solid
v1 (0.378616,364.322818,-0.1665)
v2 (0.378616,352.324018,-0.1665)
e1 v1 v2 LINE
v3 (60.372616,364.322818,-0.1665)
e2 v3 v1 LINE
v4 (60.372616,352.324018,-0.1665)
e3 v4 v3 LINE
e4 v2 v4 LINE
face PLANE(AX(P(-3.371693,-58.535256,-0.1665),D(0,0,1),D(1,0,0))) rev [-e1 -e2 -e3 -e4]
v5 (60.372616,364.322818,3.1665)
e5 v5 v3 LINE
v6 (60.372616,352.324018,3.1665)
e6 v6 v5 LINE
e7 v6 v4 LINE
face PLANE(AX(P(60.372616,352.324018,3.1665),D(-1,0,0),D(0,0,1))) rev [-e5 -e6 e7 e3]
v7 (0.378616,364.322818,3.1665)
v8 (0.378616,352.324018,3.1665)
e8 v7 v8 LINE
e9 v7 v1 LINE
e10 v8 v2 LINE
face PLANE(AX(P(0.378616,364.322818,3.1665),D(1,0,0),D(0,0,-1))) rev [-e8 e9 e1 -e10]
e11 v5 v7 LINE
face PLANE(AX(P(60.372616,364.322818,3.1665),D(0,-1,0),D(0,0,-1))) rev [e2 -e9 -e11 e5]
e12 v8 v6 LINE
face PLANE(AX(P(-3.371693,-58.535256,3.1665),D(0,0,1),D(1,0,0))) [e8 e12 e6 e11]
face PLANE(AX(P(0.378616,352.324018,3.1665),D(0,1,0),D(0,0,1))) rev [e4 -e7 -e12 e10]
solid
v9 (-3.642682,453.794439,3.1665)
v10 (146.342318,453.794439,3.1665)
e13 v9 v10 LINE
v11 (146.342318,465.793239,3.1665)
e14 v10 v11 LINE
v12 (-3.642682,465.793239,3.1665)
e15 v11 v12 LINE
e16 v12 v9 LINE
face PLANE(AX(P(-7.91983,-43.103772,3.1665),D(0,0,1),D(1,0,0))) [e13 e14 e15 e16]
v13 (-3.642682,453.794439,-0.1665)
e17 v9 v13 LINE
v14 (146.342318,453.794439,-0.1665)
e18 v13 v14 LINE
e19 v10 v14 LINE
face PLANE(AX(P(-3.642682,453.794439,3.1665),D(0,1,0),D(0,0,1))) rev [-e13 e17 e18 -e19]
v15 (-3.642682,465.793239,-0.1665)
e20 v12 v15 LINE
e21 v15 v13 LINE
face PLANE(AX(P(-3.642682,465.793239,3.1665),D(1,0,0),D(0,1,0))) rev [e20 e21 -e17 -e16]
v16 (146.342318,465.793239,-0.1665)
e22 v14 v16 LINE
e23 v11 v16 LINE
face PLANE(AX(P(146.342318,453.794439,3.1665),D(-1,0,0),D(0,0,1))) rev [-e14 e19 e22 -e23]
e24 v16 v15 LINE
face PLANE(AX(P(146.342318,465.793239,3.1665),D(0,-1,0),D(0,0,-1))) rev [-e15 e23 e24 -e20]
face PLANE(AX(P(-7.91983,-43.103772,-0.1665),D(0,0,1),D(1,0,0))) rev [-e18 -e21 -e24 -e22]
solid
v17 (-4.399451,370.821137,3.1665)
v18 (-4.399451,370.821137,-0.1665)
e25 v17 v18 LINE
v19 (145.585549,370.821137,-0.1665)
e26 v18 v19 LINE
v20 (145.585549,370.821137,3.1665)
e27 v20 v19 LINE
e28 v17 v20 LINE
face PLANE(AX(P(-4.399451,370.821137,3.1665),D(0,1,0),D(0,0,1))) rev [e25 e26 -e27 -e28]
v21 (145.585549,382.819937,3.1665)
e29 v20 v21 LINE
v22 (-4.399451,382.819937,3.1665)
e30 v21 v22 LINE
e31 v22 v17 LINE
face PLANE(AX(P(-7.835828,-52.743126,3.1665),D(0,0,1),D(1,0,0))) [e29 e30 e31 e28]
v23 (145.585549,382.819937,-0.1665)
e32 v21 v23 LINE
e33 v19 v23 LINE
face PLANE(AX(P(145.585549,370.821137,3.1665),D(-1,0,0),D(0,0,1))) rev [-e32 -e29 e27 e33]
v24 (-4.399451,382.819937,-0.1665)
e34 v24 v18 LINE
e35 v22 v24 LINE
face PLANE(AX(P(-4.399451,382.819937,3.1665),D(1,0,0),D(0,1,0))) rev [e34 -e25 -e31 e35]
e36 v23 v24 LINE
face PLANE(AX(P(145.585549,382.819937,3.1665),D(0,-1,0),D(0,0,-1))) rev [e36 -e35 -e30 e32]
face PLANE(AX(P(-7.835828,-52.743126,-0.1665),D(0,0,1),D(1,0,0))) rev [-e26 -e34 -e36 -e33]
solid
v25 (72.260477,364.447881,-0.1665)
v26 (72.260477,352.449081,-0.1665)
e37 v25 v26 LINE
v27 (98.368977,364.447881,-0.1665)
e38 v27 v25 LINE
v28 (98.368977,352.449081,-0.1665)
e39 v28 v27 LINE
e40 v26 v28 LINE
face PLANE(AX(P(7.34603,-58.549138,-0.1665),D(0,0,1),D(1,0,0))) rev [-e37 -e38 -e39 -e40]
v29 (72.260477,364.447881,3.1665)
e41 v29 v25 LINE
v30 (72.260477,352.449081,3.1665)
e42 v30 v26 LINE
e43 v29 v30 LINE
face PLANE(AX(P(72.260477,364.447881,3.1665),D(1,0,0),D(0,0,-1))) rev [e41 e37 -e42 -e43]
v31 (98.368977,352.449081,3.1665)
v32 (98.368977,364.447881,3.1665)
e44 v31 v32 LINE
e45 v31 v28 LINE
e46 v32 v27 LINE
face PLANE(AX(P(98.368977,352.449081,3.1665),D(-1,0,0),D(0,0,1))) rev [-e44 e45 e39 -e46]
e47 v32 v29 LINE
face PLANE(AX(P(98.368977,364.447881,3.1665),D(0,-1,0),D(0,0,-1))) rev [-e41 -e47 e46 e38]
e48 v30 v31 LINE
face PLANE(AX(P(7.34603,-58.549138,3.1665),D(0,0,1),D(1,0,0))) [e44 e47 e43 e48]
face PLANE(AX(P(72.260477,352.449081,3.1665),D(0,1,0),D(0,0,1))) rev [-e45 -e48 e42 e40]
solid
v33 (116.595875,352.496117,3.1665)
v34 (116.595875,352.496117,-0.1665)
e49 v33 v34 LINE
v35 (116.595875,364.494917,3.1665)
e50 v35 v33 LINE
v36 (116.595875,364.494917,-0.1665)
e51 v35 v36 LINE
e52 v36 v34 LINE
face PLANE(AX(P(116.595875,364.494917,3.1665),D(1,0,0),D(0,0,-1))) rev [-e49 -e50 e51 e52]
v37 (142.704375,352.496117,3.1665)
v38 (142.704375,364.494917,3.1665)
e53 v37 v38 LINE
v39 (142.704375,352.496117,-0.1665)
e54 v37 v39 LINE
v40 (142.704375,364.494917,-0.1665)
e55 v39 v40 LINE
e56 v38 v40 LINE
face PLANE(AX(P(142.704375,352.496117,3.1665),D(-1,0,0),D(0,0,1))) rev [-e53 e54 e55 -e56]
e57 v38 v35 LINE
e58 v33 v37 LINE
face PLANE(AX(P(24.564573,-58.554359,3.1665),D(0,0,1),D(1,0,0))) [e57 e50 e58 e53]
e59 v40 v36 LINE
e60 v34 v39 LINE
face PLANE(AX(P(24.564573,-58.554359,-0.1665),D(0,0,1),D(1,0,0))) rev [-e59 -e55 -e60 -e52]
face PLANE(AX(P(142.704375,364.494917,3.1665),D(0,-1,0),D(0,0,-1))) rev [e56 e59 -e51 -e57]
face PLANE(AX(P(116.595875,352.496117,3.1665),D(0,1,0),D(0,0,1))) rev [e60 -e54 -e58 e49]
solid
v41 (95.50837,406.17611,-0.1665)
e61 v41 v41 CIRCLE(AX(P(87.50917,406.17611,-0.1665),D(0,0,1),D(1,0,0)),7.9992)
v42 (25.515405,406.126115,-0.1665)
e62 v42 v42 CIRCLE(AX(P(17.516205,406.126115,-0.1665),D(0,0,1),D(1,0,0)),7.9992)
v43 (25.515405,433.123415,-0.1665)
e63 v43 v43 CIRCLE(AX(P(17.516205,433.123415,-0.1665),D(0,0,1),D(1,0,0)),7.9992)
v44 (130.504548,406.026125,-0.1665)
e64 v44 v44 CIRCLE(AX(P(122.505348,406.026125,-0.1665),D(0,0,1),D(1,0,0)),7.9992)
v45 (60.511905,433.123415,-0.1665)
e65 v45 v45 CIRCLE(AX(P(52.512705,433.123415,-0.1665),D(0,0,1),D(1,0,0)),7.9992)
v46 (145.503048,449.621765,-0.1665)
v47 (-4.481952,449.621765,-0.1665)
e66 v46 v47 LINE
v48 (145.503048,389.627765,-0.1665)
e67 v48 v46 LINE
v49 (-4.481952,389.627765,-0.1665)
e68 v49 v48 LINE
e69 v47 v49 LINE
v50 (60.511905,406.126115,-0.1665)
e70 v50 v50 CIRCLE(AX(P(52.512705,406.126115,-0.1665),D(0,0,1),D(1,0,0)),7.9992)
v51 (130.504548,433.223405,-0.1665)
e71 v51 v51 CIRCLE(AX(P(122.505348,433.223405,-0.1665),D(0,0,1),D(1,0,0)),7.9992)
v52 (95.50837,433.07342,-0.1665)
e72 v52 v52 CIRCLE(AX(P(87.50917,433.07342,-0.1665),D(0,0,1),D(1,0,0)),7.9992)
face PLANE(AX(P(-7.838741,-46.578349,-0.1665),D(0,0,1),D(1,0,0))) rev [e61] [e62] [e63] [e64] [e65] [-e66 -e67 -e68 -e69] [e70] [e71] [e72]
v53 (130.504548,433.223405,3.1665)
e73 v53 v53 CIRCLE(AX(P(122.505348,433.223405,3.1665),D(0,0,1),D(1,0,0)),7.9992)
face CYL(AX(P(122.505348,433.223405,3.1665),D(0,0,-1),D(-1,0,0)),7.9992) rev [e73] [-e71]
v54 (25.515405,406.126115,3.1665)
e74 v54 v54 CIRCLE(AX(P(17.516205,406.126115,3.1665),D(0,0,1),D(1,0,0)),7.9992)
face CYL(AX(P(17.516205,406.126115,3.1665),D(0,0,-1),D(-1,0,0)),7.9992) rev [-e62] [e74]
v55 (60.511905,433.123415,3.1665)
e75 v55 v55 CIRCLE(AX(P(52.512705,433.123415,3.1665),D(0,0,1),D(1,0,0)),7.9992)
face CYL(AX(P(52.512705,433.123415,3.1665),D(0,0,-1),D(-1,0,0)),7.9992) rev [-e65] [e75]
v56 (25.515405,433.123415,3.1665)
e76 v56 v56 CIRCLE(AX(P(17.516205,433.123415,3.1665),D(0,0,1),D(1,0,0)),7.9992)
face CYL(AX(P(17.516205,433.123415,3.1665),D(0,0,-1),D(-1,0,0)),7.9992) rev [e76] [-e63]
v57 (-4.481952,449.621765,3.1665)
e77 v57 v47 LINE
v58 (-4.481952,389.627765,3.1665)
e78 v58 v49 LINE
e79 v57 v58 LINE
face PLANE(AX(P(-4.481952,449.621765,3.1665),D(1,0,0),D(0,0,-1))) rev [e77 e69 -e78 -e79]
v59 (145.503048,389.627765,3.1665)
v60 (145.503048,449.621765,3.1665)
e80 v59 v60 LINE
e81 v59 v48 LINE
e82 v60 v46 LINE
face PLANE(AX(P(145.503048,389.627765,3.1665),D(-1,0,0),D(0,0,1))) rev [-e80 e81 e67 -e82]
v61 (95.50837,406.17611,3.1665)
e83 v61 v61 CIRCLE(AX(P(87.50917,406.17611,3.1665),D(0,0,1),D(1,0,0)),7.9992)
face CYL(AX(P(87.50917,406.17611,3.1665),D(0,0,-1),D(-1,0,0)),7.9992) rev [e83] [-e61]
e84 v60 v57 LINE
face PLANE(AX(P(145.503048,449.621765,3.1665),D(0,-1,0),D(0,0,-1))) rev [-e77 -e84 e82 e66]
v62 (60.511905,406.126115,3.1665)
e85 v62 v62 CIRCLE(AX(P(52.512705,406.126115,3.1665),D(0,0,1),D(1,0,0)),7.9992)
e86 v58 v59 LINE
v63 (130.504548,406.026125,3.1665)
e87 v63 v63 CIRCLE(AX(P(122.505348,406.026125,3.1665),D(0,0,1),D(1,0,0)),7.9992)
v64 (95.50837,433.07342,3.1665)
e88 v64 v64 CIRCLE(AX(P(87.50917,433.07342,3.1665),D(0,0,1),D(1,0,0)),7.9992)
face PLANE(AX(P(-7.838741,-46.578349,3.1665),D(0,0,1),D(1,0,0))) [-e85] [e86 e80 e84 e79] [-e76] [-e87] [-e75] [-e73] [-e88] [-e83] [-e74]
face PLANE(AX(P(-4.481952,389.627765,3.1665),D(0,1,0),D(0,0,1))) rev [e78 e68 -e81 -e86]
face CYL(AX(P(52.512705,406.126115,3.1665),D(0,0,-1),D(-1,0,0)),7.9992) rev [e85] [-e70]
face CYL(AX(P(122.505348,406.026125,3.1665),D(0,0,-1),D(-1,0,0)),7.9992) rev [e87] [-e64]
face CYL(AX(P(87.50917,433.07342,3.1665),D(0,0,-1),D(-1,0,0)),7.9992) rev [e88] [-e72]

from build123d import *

# Parameters (mm, degrees)
MODEL_W               = 135
MODEL_H               = 54
MODEL_R               = 7.2
BOSS_EXTRUDE1_DEPTH   = 3
MODEL_W_2             = 54
MODEL_H_2             = 10.8
BOSS_EXTRUDE1_2_DEPTH = 3
BOSS_EXTRUDE1_3_DEPTH = 3
MODEL_W_3             = 23.5
BOSS_EXTRUDE1_4_DEPTH = 3
BOSS_EXTRUDE1_5_DEPTH = 3
BOSS_EXTRUDE1_6_DEPTH = 3
SCALE1_DEPTH          = 3
SCALE1_START          = -0.1665
SCALE1_2_OUTLINE_W    = 149.985
SCALE1_2_OUTLINE_H    = 59.994
SCALE1_2_OUTLINE_R    = 7.9992
SCALE1_2_DEPTH        = 3.333
SCALE1_START_2        = 446.653714964
SCALE1_3_OUTLINE_W    = 149.985
SCALE1_3_OUTLINE_H    = 3.333
SCALE1_3_DEPTH        = 11.9988
SCALE1_START_3        = 369.383026174
SCALE1_4_OUTLINE_W    = 26.1085
SCALE1_4_OUTLINE_H    = 3.333
SCALE1_4_DEPTH        = 11.9988
SCALE1_START_4        = 369.335990799
SCALE1_5_OUTLINE_W    = 26.1085
SCALE1_5_OUTLINE_H    = 3.333
SCALE1_5_DEPTH        = 11.9988
SCALE1_START_5        = 369.210927513
SCALE1_6_OUTLINE_W    = 59.994
SCALE1_6_OUTLINE_H    = 3.333
SCALE1_6_DEPTH        = 11.9988
SCALE1_START_6        = 380.646561708
SCALE1_7_OUTLINE_W    = 149.985
SCALE1_7_OUTLINE_H    = 3.333
SCALE1_7_DEPTH        = 11.9988


# Read off the part's stored shape, not the designer's step: Scale1
with BuildPart() as part:
    # Model → Boss-Extrude1 (new body)
    with BuildSketch(Plane.XY):
        with Locations((70.521412424, 419.624764679)):
            Rectangle(MODEL_W, MODEL_H)
        with Locations((117.321412424, 431.864764679)):
            Circle(MODEL_R, mode=Mode.SUBTRACT)
        with Locations((54.321733854, 407.474764679)):
            Circle(MODEL_R, mode=Mode.SUBTRACT)
        with Locations((22.821733854, 431.774764679)):
            Circle(MODEL_R, mode=Mode.SUBTRACT)
        with Locations((22.821733854, 407.474764679)):
            Circle(MODEL_R, mode=Mode.SUBTRACT)
        with Locations((117.321412424, 407.384764679)):
            Circle(MODEL_R, mode=Mode.SUBTRACT)
        with Locations((85.821701711, 431.729764679)):
            Circle(MODEL_R, mode=Mode.SUBTRACT)
        with Locations((85.821701711, 407.519764679)):
            Circle(MODEL_R, mode=Mode.SUBTRACT)
        with Locations((54.321733854, 431.774764679)):
            Circle(MODEL_R, mode=Mode.SUBTRACT)
    extrude(amount=BOSS_EXTRUDE1_DEPTH)

    # Scale1 outline → Scale1 (cut)
    with BuildSketch(Plane.XY):
        with BuildLine():
            ThreePointArc((120.599852685, 425.454473776), (130.243207193, 435.251393662), (117.034279248, 439.059037022))
            ThreePointArc((117.034279248, 439.059037022), (124.286181967, 433.690137301), (120.599852685, 425.454473776))
        make_face()
        with BuildLine():
            ThreePointArc((59.775926661, 402.774575233), (48.549318786, 403.171367849), (51.374507231, 414.04392408))
            ThreePointArc((51.374507231, 414.04392408), (46.099552197, 401.3450408), (59.775926661, 402.774575233))
        make_face()
        with BuildLine():
            ThreePointArc((19.516367614, 425.378316132), (15.843653478, 433.548572523), (22.972146088, 438.973193408))
            ThreePointArc((22.972146088, 438.973193408), (9.76355804, 435.094115194), (19.516367614, 425.378316132))
        make_face()
        with BuildLine():
            ThreePointArc((22.972146088, 400.27633595), (15.843653478, 405.700956835), (19.516367614, 413.871213226))
            ThreePointArc((19.516367614, 413.871213226), (9.76355804, 404.155414164), (22.972146088, 400.27633595))
        make_face()
        with BuildLine():
            ThreePointArc((117.034279248, 400.190492336), (130.243207193, 403.998135696), (120.599852685, 413.795055582))
            ThreePointArc((120.599852685, 413.795055582), (124.286181967, 405.559392057), (117.034279248, 400.190492336))
        make_face()
        with BuildLine():
            ThreePointArc((88.815187829, 425.181555698), (93.766910466, 438.056177976), (80.110310207, 436.11382753))
            ThreePointArc((80.110310207, 436.11382753), (91.454231718, 436.21469564), (88.815187829, 425.181555698))
        make_face()
        with BuildLine():
            ThreePointArc((80.110310207, 403.135701828), (93.766910466, 401.193351382), (88.815187829, 414.06797366))
            ThreePointArc((88.815187829, 414.06797366), (91.454231718, 403.034833718), (80.110310207, 403.135701828))
        make_face()
        with BuildLine():
            ThreePointArc((51.374507231, 425.205605278), (48.549318786, 436.078161509), (59.775926661, 436.474954125))
            ThreePointArc((59.775926661, 436.474954125), (46.099552197, 437.904488558), (51.374507231, 425.205605278))
        make_face()
    extrude(amount=SCALE1_DEPTH, mode=Mode.SUBTRACT)

    # Scale1 2 outline → Scale1 2 (add)
    with BuildSketch(Plane.XY.offset(SCALE1_START)):
        with Locations((70.51054823, 419.624764679)):
            Rectangle(SCALE1_2_OUTLINE_W, SCALE1_2_OUTLINE_H)
        with Locations((87.509169628, 433.073419679)):
            Circle(SCALE1_2_OUTLINE_R, mode=Mode.SUBTRACT)
        with Locations((122.50534823, 433.223404679)):
            Circle(SCALE1_2_OUTLINE_R, mode=Mode.SUBTRACT)
        with Locations((17.516205338, 406.126114679)):
            Circle(SCALE1_2_OUTLINE_R, mode=Mode.SUBTRACT)
        with Locations((52.512705338, 406.126114679)):
            Circle(SCALE1_2_OUTLINE_R, mode=Mode.SUBTRACT)
        with Locations((87.509169628, 406.176109679)):
            Circle(SCALE1_2_OUTLINE_R, mode=Mode.SUBTRACT)
        with Locations((122.50534823, 406.026124679)):
            Circle(SCALE1_2_OUTLINE_R, mode=Mode.SUBTRACT)
        with Locations((17.516205338, 433.123414679)):
            Circle(SCALE1_2_OUTLINE_R, mode=Mode.SUBTRACT)
        with Locations((52.512705338, 433.123414679)):
            Circle(SCALE1_2_OUTLINE_R, mode=Mode.SUBTRACT)
    extrude(amount=SCALE1_2_DEPTH)


with BuildPart() as body_2:
    # Model → Boss-Extrude1 2 (new body)
    with BuildSketch(Plane.XY):
        with Locations((30.375615719, 375.210327513)):
            Rectangle(MODEL_W_2, MODEL_H_2)
    extrude(amount=BOSS_EXTRUDE1_2_DEPTH)

    # Scale1 6 outline → Scale1 6 (add)
    with BuildSketch(Plane(origin=(0, 0, 0), x_dir=(1, 0, 0), z_dir=(0, 1, 0)).offset(SCALE1_START_5)):
        with Locations((30.375615719, -1.5)):
            Rectangle(SCALE1_6_OUTLINE_W, SCALE1_6_OUTLINE_H)
    extrude(amount=SCALE1_6_DEPTH)


with BuildPart() as body_3:
    # Model → Boss-Extrude1 3 (new body)
    with BuildSketch(Plane.XY):
        with Locations((70.593048587, 386.645961708)):
            Rectangle(MODEL_W, MODEL_H_2)
    extrude(amount=BOSS_EXTRUDE1_3_DEPTH)

    # Scale1 7 outline → Scale1 7 (add)
    with BuildSketch(Plane(origin=(0, 0, 0), x_dir=(1, 0, 0), z_dir=(0, 1, 0)).offset(SCALE1_START_6)):
        with Locations((70.593048587, -1.5)):
            Rectangle(SCALE1_7_OUTLINE_W, SCALE1_7_OUTLINE_H)
    extrude(amount=SCALE1_7_DEPTH)


with BuildPart() as body_4:
    # Model → Boss-Extrude1 4 (new body)
    with BuildSketch(Plane.XY):
        with Locations((94.586456263, 375.382426174)):
            Rectangle(MODEL_W_3, MODEL_H_2)
    extrude(amount=BOSS_EXTRUDE1_4_DEPTH)

    # Scale1 4 outline → Scale1 4 (add)
    with BuildSketch(Plane(origin=(0, 0, 0), x_dir=(1, 0, 0), z_dir=(0, 1, 0)).offset(SCALE1_START_3)):
        with Locations((94.586456263, -1.5)):
            Rectangle(SCALE1_4_OUTLINE_W, SCALE1_4_OUTLINE_H)
    extrude(amount=SCALE1_4_DEPTH)


with BuildPart() as body_5:
    # Model → Boss-Extrude1 5 (new body)
    with BuildSketch(Plane.XY):
        with Locations((71.349818497, 452.653114964)):
            Rectangle(MODEL_W, MODEL_H_2)
    extrude(amount=BOSS_EXTRUDE1_5_DEPTH)

    # Scale1 3 outline → Scale1 3 (add)
    with BuildSketch(Plane(origin=(0, 0, 0), x_dir=(1, 0, 0), z_dir=(0, 1, 0)).offset(SCALE1_START_2)):
        with Locations((71.349818497, -1.5)):
            Rectangle(SCALE1_3_OUTLINE_W, SCALE1_3_OUTLINE_H)
    extrude(amount=SCALE1_3_DEPTH)


with BuildPart() as body_6:
    # Model → Boss-Extrude1 6 (new body)
    with BuildSketch(Plane.XY):
        with Locations((70.178845551, 375.335390799)):
            Rectangle(MODEL_W_3, MODEL_H_2)
    extrude(amount=BOSS_EXTRUDE1_6_DEPTH)

    # Scale1 5 outline → Scale1 5 (add)
    with BuildSketch(Plane(origin=(0, 0, 0), x_dir=(1, 0, 0), z_dir=(0, 1, 0)).offset(SCALE1_START_4)):
        with Locations((70.178845551, -1.5)):
            Rectangle(SCALE1_5_OUTLINE_W, SCALE1_5_OUTLINE_H)
    extrude(amount=SCALE1_5_DEPTH)


with BuildPart() as body_3_1:
    # Body-Move/Copy1: moved
    add(body_3.part.moved(Location((0, -9.825424502, 0))))


with BuildPart() as body_2_1:
    # Body-Move/Copy1: moved
    add(body_2.part.moved(Location((0, -9.825424502, 0))))


with BuildPart() as body_6_1:
    # Body-Move/Copy1: moved
    add(body_6.part.moved(Location((0, -9.825424502, 0))))


with BuildPart() as body_4_1:
    # Body-Move/Copy1: moved
    add(body_4.part.moved(Location((0, -9.825424502, 0))))


with BuildPart() as body_2_2:
    # Body-Move/Copy3: moved
    add(body_2_1.part.moved(Location((0, -7.061484852, 0))))


with BuildPart() as body_6_2:
    # Body-Move/Copy3: moved
    add(body_6_1.part.moved(Location((0, -7.061484852, 0))))


with BuildPart() as body_4_2:
    # Body-Move/Copy3: moved
    add(body_4_1.part.moved(Location((0, -7.061484852, 0))))


with BuildPart() as body_4_3:
    # Body-Move/Copy4: moved
    add(body_4_2.part.moved(Location((35.063669181, 0, 0))))


with BuildPart() as body_6_3:
    # Body-Move/Copy5: moved
    add(body_6_2.part.moved(Location((15.135881893, 0, 0))))


with BuildPart() as body_5_1:
    # Body-Move/Copy6: moved
    add(body_5.part.moved(Location((0, 7.140723713, 0))))


solid = Compound([part.part, body_3_1.part, body_2_2.part, body_4_3.part, body_6_3.part, body_5_1.part])
